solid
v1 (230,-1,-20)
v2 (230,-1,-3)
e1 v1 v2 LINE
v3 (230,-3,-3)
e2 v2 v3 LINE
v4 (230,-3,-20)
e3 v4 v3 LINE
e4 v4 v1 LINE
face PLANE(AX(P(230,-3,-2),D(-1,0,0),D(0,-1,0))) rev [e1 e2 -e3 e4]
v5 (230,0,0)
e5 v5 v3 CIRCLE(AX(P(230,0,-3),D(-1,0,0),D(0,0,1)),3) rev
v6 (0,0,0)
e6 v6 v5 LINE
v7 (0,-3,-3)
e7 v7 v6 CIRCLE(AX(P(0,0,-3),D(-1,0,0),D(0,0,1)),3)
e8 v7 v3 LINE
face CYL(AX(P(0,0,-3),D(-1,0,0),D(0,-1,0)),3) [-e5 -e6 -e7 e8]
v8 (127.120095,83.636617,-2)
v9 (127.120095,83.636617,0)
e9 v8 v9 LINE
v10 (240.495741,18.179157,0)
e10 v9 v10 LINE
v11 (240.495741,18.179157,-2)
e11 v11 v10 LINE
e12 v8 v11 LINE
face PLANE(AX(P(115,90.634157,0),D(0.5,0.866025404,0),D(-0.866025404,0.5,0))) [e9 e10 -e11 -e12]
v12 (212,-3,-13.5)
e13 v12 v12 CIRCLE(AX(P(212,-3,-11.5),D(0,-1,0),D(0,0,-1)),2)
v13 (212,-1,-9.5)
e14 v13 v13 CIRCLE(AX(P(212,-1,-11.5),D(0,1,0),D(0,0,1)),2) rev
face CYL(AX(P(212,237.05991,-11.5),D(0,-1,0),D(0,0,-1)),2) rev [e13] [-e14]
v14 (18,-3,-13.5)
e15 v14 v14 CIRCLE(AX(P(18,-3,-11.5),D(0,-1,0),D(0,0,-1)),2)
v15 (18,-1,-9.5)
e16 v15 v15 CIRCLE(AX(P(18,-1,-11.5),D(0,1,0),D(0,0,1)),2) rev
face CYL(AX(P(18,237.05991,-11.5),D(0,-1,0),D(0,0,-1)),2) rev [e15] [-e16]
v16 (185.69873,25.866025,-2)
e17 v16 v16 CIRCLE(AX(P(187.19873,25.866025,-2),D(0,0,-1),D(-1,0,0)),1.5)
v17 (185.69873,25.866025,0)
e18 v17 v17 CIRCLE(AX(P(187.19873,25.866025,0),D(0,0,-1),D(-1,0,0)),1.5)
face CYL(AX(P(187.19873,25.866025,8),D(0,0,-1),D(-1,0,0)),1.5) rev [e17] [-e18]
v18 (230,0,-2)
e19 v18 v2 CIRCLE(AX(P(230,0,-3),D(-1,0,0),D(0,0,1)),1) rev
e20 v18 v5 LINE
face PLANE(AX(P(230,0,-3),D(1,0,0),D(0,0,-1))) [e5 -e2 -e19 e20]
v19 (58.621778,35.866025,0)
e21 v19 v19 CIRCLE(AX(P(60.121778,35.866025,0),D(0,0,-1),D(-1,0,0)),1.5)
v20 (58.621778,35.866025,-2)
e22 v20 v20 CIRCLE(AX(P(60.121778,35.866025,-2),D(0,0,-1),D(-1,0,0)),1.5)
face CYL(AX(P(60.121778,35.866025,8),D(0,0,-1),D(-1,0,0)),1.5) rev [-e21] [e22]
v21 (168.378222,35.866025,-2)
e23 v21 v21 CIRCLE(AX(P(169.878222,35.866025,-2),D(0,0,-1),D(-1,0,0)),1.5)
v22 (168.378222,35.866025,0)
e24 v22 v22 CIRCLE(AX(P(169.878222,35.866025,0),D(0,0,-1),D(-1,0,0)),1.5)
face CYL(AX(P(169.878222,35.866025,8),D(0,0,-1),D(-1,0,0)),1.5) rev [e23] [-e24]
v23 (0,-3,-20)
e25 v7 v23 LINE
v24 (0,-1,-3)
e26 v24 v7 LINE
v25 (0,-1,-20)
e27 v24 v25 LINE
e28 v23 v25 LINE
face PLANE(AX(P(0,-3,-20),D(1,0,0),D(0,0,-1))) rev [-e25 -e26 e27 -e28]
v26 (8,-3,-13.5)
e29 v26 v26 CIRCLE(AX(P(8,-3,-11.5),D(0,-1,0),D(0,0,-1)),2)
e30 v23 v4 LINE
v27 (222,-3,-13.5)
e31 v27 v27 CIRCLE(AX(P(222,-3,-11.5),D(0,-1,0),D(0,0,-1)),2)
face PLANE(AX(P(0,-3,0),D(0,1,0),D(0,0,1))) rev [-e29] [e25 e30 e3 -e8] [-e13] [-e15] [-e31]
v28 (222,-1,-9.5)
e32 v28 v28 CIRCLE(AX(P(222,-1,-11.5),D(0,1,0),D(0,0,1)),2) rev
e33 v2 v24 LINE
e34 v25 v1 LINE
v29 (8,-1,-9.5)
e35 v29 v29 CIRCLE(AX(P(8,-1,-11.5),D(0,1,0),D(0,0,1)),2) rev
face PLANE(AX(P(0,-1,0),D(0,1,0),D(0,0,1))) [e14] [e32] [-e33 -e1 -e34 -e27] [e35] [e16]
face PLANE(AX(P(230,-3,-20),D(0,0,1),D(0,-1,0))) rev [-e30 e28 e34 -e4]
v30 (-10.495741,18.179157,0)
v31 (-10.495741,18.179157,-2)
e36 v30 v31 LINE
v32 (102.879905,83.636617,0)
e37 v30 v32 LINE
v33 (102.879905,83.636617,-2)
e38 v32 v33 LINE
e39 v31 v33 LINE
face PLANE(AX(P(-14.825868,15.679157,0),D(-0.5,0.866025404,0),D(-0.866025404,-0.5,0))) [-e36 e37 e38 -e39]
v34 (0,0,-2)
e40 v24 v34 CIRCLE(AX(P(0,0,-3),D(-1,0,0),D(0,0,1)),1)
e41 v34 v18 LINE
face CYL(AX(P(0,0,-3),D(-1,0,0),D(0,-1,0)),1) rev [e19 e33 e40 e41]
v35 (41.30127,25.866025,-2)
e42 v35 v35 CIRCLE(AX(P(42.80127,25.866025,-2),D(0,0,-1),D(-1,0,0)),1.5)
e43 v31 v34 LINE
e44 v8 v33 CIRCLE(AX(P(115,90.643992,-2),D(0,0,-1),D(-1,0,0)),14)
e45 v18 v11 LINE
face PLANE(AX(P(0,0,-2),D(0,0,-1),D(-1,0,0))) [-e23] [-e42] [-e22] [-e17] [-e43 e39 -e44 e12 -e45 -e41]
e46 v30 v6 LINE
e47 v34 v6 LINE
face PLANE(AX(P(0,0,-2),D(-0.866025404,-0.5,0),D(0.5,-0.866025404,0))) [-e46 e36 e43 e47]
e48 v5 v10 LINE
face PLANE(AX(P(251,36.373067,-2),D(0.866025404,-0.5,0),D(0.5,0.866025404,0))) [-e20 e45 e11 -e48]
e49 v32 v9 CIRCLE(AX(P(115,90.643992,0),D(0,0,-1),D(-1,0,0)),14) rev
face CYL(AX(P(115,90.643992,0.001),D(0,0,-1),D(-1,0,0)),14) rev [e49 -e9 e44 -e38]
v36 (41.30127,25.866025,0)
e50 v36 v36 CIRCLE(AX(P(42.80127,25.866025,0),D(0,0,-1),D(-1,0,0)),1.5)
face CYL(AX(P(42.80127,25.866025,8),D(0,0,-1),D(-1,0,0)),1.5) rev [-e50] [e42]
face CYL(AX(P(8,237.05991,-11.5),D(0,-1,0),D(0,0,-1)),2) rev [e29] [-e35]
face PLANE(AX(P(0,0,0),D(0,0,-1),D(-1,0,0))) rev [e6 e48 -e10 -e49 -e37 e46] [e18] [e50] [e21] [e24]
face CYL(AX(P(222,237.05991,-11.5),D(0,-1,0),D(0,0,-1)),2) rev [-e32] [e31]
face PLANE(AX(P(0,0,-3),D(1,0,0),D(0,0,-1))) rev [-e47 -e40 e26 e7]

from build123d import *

# Parameters (mm, degrees)
SKETCH_10_R                   = 10
SM_BASE_FLANGE_3_DEPTH        = 2
SM_EDGE_FLANGE_6_DEPTH        = 230
SM_EDGE_FLANGE_6_BEND_DEPTH   = 230
SM_EDGE_FLANGE_6_BEND_2_DEPTH = 230
CUT_EXTRUDE_4_REACH           = 363.137
SKETCH_47_R                   = 2
CUT_EXTRUDE_6_REACH           = 263.424
SKETCH_50_R                   = 2
CUT_EXTRUDE_7_REACH           = 351.772
SKETCH_51_R                   = 2
CUT_EXTRUDE_8_REACH           = 349.61
SKETCH_52_R                   = 14
SKETCH_53_R                   = 1.5
CUT_EXTRUDE_9_DEPTH           = 10
OTHER_START                   = -20
OTHER_1_OUTLINE_R             = 1.5
OTHER_1_OUTLINE_R_2           = 10
OTHER_1_DEPTH                 = 20


# Read off the part's stored shape, not the designer's step: Полость1
# Sheet-metal steps are written as plain solids
with BuildPart() as part:
    # Эскиз10 → Базовая кромка3 (new body)
    with BuildSketch(Plane.XY):
        Polygon((0, 0), (-21, 36.373066959), (94, 235.558909829), (136, 235.558909829), (251, 36.373066959), (230, 0), align=None)
        with Locations((171.849364905, 123.465988394)):
            Circle(SKETCH_10_R, mode=Mode.SUBTRACT)
    extrude(amount=-SM_BASE_FLANGE_3_DEPTH)

    # Ребро-кромка6 section (across the edge) → Ребро-кромка6 (add)
    with BuildSketch(Plane(origin=(-21.866025404, 36.873066959, -2), x_dir=(0.8660254037844436, -0.4999999999999914, -3.4914813388431334e-15), z_dir=(0.4999999999999914, 0.8660254037844436, 0))):
        with BuildLine():
            Line((-2, 1), (-2, 18))
            Line((-2, 18), (0, 18))
            Line((0, 18), (0, 1))
            ThreePointArc((0, 1), (0.292893219, 0.292893219), (1, 0))
            Line((1, 0), (1, -2))
            ThreePointArc((1, -2), (-1.121320344, -1.121320344), (-2, 1))
        make_face()
    extrude(amount=SM_EDGE_FLANGE_6_DEPTH)

    # Ребро-кромка6 section 2 (across the edge) → Ребро-кромка6 bend (add)
    with BuildSketch(Plane(origin=(136.866025404, 236.058909829, -2), x_dir=(-0.8660254037844363, -0.5000000000000041, -3.4914813388431334e-15), z_dir=(0.5000000000000041, -0.8660254037844363, 0))):
        with BuildLine():
            Line((-2, 1), (-2, 18))
            Line((-2, 18), (0, 18))
            Line((0, 18), (0, 1))
            ThreePointArc((0, 1), (0.292893219, 0.292893219), (1, 0))
            Line((1, 0), (1, -2))
            ThreePointArc((1, -2), (-1.121320344, -1.121320344), (-2, 1))
        make_face()
    extrude(amount=SM_EDGE_FLANGE_6_BEND_DEPTH)

    # Ребро-кромка6 section 3 (across the edge) → Ребро-кромка6 bend 2 (add)
    with BuildSketch(Plane(origin=(230, -1, -2), x_dir=(0, 1, 0), z_dir=(-1, 0, 0))):
        with BuildLine():
            Line((-2, 1), (-2, 18))
            Line((-2, 18), (0, 18))
            Line((0, 18), (0, 1))
            ThreePointArc((0, 1), (0.292893219, 0.292893219), (1, 0))
            Line((1, 0), (1, -2))
            ThreePointArc((1, -2), (-1.121320344, -1.121320344), (-2, 1))
        make_face()
    extrude(amount=SM_EDGE_FLANGE_6_BEND_2_DEPTH)

    # Эскиз47 → Вырез-Вытянуть4 (cut, up to next)
    with BuildSketch(Plane(origin=(-34.098076211, 19.686533479, 0), x_dir=(0, 0, 1), z_dir=(-0.866025403784443, 0.4999999999999925, 3.788649256556814e-15)), mode=Mode.PRIVATE) as cut_extrude_4_sk1:
        with Locations(Location((-11.5, 29, 0), (0, 0, 270))):
            Circle(SKETCH_47_R)
    cut_extrude_4_tool1 = extrude(cut_extrude_4_sk1.sketch, amount=-CUT_EXTRUDE_4_REACH, mode=Mode.PRIVATE) & part.part
    # Эскиз47 → Вырез-Вытянуть4 (cut, up to next)
    with BuildSketch(Plane(origin=(-34.098076211, 19.686533479, 0), x_dir=(0, 0, 1), z_dir=(-0.866025403784443, 0.4999999999999925, 3.788649256556814e-15)), mode=Mode.PRIVATE) as cut_extrude_4_sk2:
        with Locations(Location((-11.5, 39, 0), (0, 0, 270))):
            Circle(SKETCH_47_R)
    cut_extrude_4_tool2 = extrude(cut_extrude_4_sk2.sketch, amount=-CUT_EXTRUDE_4_REACH, mode=Mode.PRIVATE) & part.part
    # Эскиз47 → Вырез-Вытянуть4 (cut, up to next)
    with BuildSketch(Plane(origin=(-34.098076211, 19.686533479, 0), x_dir=(0, 0, 1), z_dir=(-0.866025403784443, 0.4999999999999925, 3.788649256556814e-15)), mode=Mode.PRIVATE) as cut_extrude_4_sk3:
        with Locations(Location((-11.5, 233, 0), (0, 0, 270))):
            Circle(SKETCH_47_R)
    cut_extrude_4_tool3 = extrude(cut_extrude_4_sk3.sketch, amount=-CUT_EXTRUDE_4_REACH, mode=Mode.PRIVATE) & part.part
    # Эскиз47 → Вырез-Вытянуть4 (cut, up to next)
    with BuildSketch(Plane(origin=(-34.098076211, 19.686533479, 0), x_dir=(0, 0, 1), z_dir=(-0.866025403784443, 0.4999999999999925, 3.788649256556814e-15)), mode=Mode.PRIVATE) as cut_extrude_4_sk4:
        with Locations(Location((-11.5, 243, 0), (0, 0, 270))):
            Circle(SKETCH_47_R)
    cut_extrude_4_tool4 = extrude(cut_extrude_4_sk4.sketch, amount=-CUT_EXTRUDE_4_REACH, mode=Mode.PRIVATE) & part.part
    add(cut_extrude_4_tool1.solids().sort_by_distance((-19.598076, 44.80127, -11.5))[0], mode=Mode.SUBTRACT)
    add(cut_extrude_4_tool2.solids().sort_by_distance((-14.598076, 53.461524, -11.5))[0], mode=Mode.SUBTRACT)
    add(cut_extrude_4_tool3.solids().sort_by_distance((82.401924, 221.470453, -11.5))[0], mode=Mode.SUBTRACT)
    add(cut_extrude_4_tool4.solids().sort_by_distance((87.401924, 230.130707, -11.5))[0], mode=Mode.SUBTRACT)

    # Эскиз50 → Вырез-Вытянуть6 (cut, up to next)
    with BuildSketch(Plane(origin=(206.598076211, 119.279454915, 0), x_dir=(0, 0, -1), z_dir=(0.866025403784436, 0.5000000000000047, 3.0623287353932815e-15)), mode=Mode.PRIVATE) as cut_extrude_6_sk1:
        with Locations(Location((11.5, -86, 0), (0, 0, 90))):
            Circle(SKETCH_50_R)
    cut_extrude_6_tool1 = extrude(cut_extrude_6_sk1.sketch, amount=-CUT_EXTRUDE_6_REACH, mode=Mode.PRIVATE) & part.part
    # Эскиз50 → Вырез-Вытянуть6 (cut, up to next)
    with BuildSketch(Plane(origin=(206.598076211, 119.279454915, 0), x_dir=(0, 0, -1), z_dir=(0.866025403784436, 0.5000000000000047, 3.0623287353932815e-15)), mode=Mode.PRIVATE) as cut_extrude_6_sk2:
        with Locations(Location((11.5, -76, 0), (0, 0, 90))):
            Circle(SKETCH_50_R)
    cut_extrude_6_tool2 = extrude(cut_extrude_6_sk2.sketch, amount=-CUT_EXTRUDE_6_REACH, mode=Mode.PRIVATE) & part.part
    # Эскиз50 → Вырез-Вытянуть6 (cut, up to next)
    with BuildSketch(Plane(origin=(206.598076211, 119.279454915, 0), x_dir=(0, 0, -1), z_dir=(0.866025403784436, 0.5000000000000047, 3.0623287353932815e-15)), mode=Mode.PRIVATE) as cut_extrude_6_sk3:
        with Locations(Location((11.5, 118, 0), (0, 0, 90))):
            Circle(SKETCH_50_R)
    cut_extrude_6_tool3 = extrude(cut_extrude_6_sk3.sketch, amount=-CUT_EXTRUDE_6_REACH, mode=Mode.PRIVATE) & part.part
    # Эскиз50 → Вырез-Вытянуть6 (cut, up to next)
    with BuildSketch(Plane(origin=(206.598076211, 119.279454915, 0), x_dir=(0, 0, -1), z_dir=(0.866025403784436, 0.5000000000000047, 3.0623287353932815e-15)), mode=Mode.PRIVATE) as cut_extrude_6_sk4:
        with Locations(Location((11.5, 128, 0), (0, 0, 90))):
            Circle(SKETCH_50_R)
    cut_extrude_6_tool4 = extrude(cut_extrude_6_sk4.sketch, amount=-CUT_EXTRUDE_6_REACH, mode=Mode.PRIVATE) & part.part
    add(cut_extrude_6_tool1.solids().sort_by_distance((249.598076, 44.80127, -11.5))[0], mode=Mode.SUBTRACT)
    add(cut_extrude_6_tool2.solids().sort_by_distance((244.598076, 53.461524, -11.5))[0], mode=Mode.SUBTRACT)
    add(cut_extrude_6_tool3.solids().sort_by_distance((147.598076, 221.470453, -11.5))[0], mode=Mode.SUBTRACT)
    add(cut_extrude_6_tool4.solids().sort_by_distance((142.598076, 230.130707, -11.5))[0], mode=Mode.SUBTRACT)

    # Эскиз51 → Вырез-Вытянуть7 (cut, up to next)
    with BuildSketch(Plane.XZ.offset(3), mode=Mode.PRIVATE) as cut_extrude_7_sk1:
        with Locations(Location((222, -11.5, 0), (0, 0, 270))):
            Circle(SKETCH_51_R)
    cut_extrude_7_tool1 = extrude(cut_extrude_7_sk1.sketch, amount=-CUT_EXTRUDE_7_REACH, mode=Mode.PRIVATE) & part.part
    # Эскиз51 → Вырез-Вытянуть7 (cut, up to next)
    with BuildSketch(Plane.XZ.offset(3), mode=Mode.PRIVATE) as cut_extrude_7_sk2:
        with Locations(Location((212, -11.5, 0), (0, 0, 270))):
            Circle(SKETCH_51_R)
    cut_extrude_7_tool2 = extrude(cut_extrude_7_sk2.sketch, amount=-CUT_EXTRUDE_7_REACH, mode=Mode.PRIVATE) & part.part
    # Эскиз51 → Вырез-Вытянуть7 (cut, up to next)
    with BuildSketch(Plane.XZ.offset(3), mode=Mode.PRIVATE) as cut_extrude_7_sk3:
        with Locations(Location((18, -11.5, 0), (0, 0, 270))):
            Circle(SKETCH_51_R)
    cut_extrude_7_tool3 = extrude(cut_extrude_7_sk3.sketch, amount=-CUT_EXTRUDE_7_REACH, mode=Mode.PRIVATE) & part.part
    # Эскиз51 → Вырез-Вытянуть7 (cut, up to next)
    with BuildSketch(Plane.XZ.offset(3), mode=Mode.PRIVATE) as cut_extrude_7_sk4:
        with Locations(Location((8, -11.5, 0), (0, 0, 270))):
            Circle(SKETCH_51_R)
    cut_extrude_7_tool4 = extrude(cut_extrude_7_sk4.sketch, amount=-CUT_EXTRUDE_7_REACH, mode=Mode.PRIVATE) & part.part
    add(cut_extrude_7_tool1.solids().sort_by_distance((222, -3, -11.5))[0], mode=Mode.SUBTRACT)
    add(cut_extrude_7_tool2.solids().sort_by_distance((212, -3, -11.5))[0], mode=Mode.SUBTRACT)
    add(cut_extrude_7_tool3.solids().sort_by_distance((18, -3, -11.5))[0], mode=Mode.SUBTRACT)
    add(cut_extrude_7_tool4.solids().sort_by_distance((8, -3, -11.5))[0], mode=Mode.SUBTRACT)

    # Эскиз52 → Вырез-Вытянуть8 (cut, up to next)
    with BuildSketch(Plane(origin=(0, 0, -2), x_dir=(-1, 0, 0), z_dir=(0, 0, -1)), mode=Mode.PRIVATE) as cut_extrude_8_sk1:
        with Locations((-115, 90.643992263)):
            Circle(SKETCH_52_R)
    cut_extrude_8_tool1 = extrude(cut_extrude_8_sk1.sketch, amount=-CUT_EXTRUDE_8_REACH, mode=Mode.PRIVATE) & part.part
    add(cut_extrude_8_tool1.solids().sort_by_distance((115, 90.643992, -2))[0], mode=Mode.SUBTRACT)

    # Эскиз53 → Вырез-Вытянуть9 (cut)
    with BuildSketch(Plane(origin=(0, 0, -2), x_dir=(-1, 0, 0), z_dir=(0, 0, -1))):
        with Locations((-40.121778265, 70.507041555)):
            Circle(SKETCH_53_R)
        with Locations((-22.801270189, 60.507041555)):
            Circle(SKETCH_53_R)
        with Locations((-60.121778265, 35.866025404)):
            Circle(SKETCH_53_R)
        with Locations((-42.801270189, 25.866025404)):
            Circle(SKETCH_53_R)
        with Locations((-95, 185.558909829)):
            Circle(SKETCH_53_R)
        with Locations((-95, 165.558909829)):
            Circle(SKETCH_53_R)
        with Locations((-135, 185.558909829)):
            Circle(SKETCH_53_R)
        with Locations((-135, 165.558909829)):
            Circle(SKETCH_53_R)
        with Locations((-207.198729811, 60.507041555)):
            Circle(SKETCH_53_R)
        with Locations((-189.878221735, 70.507041555)):
            Circle(SKETCH_53_R)
        with Locations((-187.198729811, 25.866025404)):
            Circle(SKETCH_53_R)
        with Locations((-169.878221735, 35.866025404)):
            Circle(SKETCH_53_R)
    extrude(amount=-CUT_EXTRUDE_9_DEPTH, mode=Mode.SUBTRACT)

    # Полость1 outline → Полость1 (cut)
    with BuildSketch(Plane.XY.offset(OTHER_START)):
        with BuildLine():
            Line((127.120094671, 83.636617208), (240.495741262, 18.17915713))
            Line((240.495741262, 18.17915713), (251, 36.373066959))
            Line((251, 36.373066959), (253.598076211, 37.873066959))
            Line((253.598076211, 37.873066959), (138.598076211, 237.058909829))
            Line((138.598076211, 237.058909829), (136, 235.558909829))
            Line((136, 235.558909829), (94, 235.558909829))
            Line((94, 235.558909829), (91.401923789, 237.058909829))
            Line((91.401923789, 237.058909829), (-23.598076211, 37.873066959))
            Line((-23.598076211, 37.873066959), (-21, 36.373066959))
            Line((-21, 36.373066959), (-10.495741262, 18.17915713))
            Line((-10.495741262, 18.17915713), (102.879905329, 83.636617208))
            ThreePointArc((102.879905329, 83.636617208), (115, 104.643992263), (127.120094671, 83.636617208))
        make_face()
        with Locations((22.801270189, 60.507041555)):
            Circle(OTHER_1_OUTLINE_R, mode=Mode.SUBTRACT)
        with Locations((40.121778265, 70.507041555)):
            Circle(OTHER_1_OUTLINE_R, mode=Mode.SUBTRACT)
        with Locations((189.878221735, 70.507041555)):
            Circle(OTHER_1_OUTLINE_R, mode=Mode.SUBTRACT)
        with Locations((207.198729811, 60.507041555)):
            Circle(OTHER_1_OUTLINE_R, mode=Mode.SUBTRACT)
        with Locations((171.849364905, 123.465988394)):
            Circle(OTHER_1_OUTLINE_R_2, mode=Mode.SUBTRACT)
        with Locations((95, 165.558909829)):
            Circle(OTHER_1_OUTLINE_R, mode=Mode.SUBTRACT)
        with Locations((95, 185.558909829)):
            Circle(OTHER_1_OUTLINE_R, mode=Mode.SUBTRACT)
        with Locations((135, 165.558909829)):
            Circle(OTHER_1_OUTLINE_R, mode=Mode.SUBTRACT)
        with Locations((135, 185.558909829)):
            Circle(OTHER_1_OUTLINE_R, mode=Mode.SUBTRACT)
    extrude(amount=OTHER_1_DEPTH, mode=Mode.SUBTRACT)


solid = part.part
